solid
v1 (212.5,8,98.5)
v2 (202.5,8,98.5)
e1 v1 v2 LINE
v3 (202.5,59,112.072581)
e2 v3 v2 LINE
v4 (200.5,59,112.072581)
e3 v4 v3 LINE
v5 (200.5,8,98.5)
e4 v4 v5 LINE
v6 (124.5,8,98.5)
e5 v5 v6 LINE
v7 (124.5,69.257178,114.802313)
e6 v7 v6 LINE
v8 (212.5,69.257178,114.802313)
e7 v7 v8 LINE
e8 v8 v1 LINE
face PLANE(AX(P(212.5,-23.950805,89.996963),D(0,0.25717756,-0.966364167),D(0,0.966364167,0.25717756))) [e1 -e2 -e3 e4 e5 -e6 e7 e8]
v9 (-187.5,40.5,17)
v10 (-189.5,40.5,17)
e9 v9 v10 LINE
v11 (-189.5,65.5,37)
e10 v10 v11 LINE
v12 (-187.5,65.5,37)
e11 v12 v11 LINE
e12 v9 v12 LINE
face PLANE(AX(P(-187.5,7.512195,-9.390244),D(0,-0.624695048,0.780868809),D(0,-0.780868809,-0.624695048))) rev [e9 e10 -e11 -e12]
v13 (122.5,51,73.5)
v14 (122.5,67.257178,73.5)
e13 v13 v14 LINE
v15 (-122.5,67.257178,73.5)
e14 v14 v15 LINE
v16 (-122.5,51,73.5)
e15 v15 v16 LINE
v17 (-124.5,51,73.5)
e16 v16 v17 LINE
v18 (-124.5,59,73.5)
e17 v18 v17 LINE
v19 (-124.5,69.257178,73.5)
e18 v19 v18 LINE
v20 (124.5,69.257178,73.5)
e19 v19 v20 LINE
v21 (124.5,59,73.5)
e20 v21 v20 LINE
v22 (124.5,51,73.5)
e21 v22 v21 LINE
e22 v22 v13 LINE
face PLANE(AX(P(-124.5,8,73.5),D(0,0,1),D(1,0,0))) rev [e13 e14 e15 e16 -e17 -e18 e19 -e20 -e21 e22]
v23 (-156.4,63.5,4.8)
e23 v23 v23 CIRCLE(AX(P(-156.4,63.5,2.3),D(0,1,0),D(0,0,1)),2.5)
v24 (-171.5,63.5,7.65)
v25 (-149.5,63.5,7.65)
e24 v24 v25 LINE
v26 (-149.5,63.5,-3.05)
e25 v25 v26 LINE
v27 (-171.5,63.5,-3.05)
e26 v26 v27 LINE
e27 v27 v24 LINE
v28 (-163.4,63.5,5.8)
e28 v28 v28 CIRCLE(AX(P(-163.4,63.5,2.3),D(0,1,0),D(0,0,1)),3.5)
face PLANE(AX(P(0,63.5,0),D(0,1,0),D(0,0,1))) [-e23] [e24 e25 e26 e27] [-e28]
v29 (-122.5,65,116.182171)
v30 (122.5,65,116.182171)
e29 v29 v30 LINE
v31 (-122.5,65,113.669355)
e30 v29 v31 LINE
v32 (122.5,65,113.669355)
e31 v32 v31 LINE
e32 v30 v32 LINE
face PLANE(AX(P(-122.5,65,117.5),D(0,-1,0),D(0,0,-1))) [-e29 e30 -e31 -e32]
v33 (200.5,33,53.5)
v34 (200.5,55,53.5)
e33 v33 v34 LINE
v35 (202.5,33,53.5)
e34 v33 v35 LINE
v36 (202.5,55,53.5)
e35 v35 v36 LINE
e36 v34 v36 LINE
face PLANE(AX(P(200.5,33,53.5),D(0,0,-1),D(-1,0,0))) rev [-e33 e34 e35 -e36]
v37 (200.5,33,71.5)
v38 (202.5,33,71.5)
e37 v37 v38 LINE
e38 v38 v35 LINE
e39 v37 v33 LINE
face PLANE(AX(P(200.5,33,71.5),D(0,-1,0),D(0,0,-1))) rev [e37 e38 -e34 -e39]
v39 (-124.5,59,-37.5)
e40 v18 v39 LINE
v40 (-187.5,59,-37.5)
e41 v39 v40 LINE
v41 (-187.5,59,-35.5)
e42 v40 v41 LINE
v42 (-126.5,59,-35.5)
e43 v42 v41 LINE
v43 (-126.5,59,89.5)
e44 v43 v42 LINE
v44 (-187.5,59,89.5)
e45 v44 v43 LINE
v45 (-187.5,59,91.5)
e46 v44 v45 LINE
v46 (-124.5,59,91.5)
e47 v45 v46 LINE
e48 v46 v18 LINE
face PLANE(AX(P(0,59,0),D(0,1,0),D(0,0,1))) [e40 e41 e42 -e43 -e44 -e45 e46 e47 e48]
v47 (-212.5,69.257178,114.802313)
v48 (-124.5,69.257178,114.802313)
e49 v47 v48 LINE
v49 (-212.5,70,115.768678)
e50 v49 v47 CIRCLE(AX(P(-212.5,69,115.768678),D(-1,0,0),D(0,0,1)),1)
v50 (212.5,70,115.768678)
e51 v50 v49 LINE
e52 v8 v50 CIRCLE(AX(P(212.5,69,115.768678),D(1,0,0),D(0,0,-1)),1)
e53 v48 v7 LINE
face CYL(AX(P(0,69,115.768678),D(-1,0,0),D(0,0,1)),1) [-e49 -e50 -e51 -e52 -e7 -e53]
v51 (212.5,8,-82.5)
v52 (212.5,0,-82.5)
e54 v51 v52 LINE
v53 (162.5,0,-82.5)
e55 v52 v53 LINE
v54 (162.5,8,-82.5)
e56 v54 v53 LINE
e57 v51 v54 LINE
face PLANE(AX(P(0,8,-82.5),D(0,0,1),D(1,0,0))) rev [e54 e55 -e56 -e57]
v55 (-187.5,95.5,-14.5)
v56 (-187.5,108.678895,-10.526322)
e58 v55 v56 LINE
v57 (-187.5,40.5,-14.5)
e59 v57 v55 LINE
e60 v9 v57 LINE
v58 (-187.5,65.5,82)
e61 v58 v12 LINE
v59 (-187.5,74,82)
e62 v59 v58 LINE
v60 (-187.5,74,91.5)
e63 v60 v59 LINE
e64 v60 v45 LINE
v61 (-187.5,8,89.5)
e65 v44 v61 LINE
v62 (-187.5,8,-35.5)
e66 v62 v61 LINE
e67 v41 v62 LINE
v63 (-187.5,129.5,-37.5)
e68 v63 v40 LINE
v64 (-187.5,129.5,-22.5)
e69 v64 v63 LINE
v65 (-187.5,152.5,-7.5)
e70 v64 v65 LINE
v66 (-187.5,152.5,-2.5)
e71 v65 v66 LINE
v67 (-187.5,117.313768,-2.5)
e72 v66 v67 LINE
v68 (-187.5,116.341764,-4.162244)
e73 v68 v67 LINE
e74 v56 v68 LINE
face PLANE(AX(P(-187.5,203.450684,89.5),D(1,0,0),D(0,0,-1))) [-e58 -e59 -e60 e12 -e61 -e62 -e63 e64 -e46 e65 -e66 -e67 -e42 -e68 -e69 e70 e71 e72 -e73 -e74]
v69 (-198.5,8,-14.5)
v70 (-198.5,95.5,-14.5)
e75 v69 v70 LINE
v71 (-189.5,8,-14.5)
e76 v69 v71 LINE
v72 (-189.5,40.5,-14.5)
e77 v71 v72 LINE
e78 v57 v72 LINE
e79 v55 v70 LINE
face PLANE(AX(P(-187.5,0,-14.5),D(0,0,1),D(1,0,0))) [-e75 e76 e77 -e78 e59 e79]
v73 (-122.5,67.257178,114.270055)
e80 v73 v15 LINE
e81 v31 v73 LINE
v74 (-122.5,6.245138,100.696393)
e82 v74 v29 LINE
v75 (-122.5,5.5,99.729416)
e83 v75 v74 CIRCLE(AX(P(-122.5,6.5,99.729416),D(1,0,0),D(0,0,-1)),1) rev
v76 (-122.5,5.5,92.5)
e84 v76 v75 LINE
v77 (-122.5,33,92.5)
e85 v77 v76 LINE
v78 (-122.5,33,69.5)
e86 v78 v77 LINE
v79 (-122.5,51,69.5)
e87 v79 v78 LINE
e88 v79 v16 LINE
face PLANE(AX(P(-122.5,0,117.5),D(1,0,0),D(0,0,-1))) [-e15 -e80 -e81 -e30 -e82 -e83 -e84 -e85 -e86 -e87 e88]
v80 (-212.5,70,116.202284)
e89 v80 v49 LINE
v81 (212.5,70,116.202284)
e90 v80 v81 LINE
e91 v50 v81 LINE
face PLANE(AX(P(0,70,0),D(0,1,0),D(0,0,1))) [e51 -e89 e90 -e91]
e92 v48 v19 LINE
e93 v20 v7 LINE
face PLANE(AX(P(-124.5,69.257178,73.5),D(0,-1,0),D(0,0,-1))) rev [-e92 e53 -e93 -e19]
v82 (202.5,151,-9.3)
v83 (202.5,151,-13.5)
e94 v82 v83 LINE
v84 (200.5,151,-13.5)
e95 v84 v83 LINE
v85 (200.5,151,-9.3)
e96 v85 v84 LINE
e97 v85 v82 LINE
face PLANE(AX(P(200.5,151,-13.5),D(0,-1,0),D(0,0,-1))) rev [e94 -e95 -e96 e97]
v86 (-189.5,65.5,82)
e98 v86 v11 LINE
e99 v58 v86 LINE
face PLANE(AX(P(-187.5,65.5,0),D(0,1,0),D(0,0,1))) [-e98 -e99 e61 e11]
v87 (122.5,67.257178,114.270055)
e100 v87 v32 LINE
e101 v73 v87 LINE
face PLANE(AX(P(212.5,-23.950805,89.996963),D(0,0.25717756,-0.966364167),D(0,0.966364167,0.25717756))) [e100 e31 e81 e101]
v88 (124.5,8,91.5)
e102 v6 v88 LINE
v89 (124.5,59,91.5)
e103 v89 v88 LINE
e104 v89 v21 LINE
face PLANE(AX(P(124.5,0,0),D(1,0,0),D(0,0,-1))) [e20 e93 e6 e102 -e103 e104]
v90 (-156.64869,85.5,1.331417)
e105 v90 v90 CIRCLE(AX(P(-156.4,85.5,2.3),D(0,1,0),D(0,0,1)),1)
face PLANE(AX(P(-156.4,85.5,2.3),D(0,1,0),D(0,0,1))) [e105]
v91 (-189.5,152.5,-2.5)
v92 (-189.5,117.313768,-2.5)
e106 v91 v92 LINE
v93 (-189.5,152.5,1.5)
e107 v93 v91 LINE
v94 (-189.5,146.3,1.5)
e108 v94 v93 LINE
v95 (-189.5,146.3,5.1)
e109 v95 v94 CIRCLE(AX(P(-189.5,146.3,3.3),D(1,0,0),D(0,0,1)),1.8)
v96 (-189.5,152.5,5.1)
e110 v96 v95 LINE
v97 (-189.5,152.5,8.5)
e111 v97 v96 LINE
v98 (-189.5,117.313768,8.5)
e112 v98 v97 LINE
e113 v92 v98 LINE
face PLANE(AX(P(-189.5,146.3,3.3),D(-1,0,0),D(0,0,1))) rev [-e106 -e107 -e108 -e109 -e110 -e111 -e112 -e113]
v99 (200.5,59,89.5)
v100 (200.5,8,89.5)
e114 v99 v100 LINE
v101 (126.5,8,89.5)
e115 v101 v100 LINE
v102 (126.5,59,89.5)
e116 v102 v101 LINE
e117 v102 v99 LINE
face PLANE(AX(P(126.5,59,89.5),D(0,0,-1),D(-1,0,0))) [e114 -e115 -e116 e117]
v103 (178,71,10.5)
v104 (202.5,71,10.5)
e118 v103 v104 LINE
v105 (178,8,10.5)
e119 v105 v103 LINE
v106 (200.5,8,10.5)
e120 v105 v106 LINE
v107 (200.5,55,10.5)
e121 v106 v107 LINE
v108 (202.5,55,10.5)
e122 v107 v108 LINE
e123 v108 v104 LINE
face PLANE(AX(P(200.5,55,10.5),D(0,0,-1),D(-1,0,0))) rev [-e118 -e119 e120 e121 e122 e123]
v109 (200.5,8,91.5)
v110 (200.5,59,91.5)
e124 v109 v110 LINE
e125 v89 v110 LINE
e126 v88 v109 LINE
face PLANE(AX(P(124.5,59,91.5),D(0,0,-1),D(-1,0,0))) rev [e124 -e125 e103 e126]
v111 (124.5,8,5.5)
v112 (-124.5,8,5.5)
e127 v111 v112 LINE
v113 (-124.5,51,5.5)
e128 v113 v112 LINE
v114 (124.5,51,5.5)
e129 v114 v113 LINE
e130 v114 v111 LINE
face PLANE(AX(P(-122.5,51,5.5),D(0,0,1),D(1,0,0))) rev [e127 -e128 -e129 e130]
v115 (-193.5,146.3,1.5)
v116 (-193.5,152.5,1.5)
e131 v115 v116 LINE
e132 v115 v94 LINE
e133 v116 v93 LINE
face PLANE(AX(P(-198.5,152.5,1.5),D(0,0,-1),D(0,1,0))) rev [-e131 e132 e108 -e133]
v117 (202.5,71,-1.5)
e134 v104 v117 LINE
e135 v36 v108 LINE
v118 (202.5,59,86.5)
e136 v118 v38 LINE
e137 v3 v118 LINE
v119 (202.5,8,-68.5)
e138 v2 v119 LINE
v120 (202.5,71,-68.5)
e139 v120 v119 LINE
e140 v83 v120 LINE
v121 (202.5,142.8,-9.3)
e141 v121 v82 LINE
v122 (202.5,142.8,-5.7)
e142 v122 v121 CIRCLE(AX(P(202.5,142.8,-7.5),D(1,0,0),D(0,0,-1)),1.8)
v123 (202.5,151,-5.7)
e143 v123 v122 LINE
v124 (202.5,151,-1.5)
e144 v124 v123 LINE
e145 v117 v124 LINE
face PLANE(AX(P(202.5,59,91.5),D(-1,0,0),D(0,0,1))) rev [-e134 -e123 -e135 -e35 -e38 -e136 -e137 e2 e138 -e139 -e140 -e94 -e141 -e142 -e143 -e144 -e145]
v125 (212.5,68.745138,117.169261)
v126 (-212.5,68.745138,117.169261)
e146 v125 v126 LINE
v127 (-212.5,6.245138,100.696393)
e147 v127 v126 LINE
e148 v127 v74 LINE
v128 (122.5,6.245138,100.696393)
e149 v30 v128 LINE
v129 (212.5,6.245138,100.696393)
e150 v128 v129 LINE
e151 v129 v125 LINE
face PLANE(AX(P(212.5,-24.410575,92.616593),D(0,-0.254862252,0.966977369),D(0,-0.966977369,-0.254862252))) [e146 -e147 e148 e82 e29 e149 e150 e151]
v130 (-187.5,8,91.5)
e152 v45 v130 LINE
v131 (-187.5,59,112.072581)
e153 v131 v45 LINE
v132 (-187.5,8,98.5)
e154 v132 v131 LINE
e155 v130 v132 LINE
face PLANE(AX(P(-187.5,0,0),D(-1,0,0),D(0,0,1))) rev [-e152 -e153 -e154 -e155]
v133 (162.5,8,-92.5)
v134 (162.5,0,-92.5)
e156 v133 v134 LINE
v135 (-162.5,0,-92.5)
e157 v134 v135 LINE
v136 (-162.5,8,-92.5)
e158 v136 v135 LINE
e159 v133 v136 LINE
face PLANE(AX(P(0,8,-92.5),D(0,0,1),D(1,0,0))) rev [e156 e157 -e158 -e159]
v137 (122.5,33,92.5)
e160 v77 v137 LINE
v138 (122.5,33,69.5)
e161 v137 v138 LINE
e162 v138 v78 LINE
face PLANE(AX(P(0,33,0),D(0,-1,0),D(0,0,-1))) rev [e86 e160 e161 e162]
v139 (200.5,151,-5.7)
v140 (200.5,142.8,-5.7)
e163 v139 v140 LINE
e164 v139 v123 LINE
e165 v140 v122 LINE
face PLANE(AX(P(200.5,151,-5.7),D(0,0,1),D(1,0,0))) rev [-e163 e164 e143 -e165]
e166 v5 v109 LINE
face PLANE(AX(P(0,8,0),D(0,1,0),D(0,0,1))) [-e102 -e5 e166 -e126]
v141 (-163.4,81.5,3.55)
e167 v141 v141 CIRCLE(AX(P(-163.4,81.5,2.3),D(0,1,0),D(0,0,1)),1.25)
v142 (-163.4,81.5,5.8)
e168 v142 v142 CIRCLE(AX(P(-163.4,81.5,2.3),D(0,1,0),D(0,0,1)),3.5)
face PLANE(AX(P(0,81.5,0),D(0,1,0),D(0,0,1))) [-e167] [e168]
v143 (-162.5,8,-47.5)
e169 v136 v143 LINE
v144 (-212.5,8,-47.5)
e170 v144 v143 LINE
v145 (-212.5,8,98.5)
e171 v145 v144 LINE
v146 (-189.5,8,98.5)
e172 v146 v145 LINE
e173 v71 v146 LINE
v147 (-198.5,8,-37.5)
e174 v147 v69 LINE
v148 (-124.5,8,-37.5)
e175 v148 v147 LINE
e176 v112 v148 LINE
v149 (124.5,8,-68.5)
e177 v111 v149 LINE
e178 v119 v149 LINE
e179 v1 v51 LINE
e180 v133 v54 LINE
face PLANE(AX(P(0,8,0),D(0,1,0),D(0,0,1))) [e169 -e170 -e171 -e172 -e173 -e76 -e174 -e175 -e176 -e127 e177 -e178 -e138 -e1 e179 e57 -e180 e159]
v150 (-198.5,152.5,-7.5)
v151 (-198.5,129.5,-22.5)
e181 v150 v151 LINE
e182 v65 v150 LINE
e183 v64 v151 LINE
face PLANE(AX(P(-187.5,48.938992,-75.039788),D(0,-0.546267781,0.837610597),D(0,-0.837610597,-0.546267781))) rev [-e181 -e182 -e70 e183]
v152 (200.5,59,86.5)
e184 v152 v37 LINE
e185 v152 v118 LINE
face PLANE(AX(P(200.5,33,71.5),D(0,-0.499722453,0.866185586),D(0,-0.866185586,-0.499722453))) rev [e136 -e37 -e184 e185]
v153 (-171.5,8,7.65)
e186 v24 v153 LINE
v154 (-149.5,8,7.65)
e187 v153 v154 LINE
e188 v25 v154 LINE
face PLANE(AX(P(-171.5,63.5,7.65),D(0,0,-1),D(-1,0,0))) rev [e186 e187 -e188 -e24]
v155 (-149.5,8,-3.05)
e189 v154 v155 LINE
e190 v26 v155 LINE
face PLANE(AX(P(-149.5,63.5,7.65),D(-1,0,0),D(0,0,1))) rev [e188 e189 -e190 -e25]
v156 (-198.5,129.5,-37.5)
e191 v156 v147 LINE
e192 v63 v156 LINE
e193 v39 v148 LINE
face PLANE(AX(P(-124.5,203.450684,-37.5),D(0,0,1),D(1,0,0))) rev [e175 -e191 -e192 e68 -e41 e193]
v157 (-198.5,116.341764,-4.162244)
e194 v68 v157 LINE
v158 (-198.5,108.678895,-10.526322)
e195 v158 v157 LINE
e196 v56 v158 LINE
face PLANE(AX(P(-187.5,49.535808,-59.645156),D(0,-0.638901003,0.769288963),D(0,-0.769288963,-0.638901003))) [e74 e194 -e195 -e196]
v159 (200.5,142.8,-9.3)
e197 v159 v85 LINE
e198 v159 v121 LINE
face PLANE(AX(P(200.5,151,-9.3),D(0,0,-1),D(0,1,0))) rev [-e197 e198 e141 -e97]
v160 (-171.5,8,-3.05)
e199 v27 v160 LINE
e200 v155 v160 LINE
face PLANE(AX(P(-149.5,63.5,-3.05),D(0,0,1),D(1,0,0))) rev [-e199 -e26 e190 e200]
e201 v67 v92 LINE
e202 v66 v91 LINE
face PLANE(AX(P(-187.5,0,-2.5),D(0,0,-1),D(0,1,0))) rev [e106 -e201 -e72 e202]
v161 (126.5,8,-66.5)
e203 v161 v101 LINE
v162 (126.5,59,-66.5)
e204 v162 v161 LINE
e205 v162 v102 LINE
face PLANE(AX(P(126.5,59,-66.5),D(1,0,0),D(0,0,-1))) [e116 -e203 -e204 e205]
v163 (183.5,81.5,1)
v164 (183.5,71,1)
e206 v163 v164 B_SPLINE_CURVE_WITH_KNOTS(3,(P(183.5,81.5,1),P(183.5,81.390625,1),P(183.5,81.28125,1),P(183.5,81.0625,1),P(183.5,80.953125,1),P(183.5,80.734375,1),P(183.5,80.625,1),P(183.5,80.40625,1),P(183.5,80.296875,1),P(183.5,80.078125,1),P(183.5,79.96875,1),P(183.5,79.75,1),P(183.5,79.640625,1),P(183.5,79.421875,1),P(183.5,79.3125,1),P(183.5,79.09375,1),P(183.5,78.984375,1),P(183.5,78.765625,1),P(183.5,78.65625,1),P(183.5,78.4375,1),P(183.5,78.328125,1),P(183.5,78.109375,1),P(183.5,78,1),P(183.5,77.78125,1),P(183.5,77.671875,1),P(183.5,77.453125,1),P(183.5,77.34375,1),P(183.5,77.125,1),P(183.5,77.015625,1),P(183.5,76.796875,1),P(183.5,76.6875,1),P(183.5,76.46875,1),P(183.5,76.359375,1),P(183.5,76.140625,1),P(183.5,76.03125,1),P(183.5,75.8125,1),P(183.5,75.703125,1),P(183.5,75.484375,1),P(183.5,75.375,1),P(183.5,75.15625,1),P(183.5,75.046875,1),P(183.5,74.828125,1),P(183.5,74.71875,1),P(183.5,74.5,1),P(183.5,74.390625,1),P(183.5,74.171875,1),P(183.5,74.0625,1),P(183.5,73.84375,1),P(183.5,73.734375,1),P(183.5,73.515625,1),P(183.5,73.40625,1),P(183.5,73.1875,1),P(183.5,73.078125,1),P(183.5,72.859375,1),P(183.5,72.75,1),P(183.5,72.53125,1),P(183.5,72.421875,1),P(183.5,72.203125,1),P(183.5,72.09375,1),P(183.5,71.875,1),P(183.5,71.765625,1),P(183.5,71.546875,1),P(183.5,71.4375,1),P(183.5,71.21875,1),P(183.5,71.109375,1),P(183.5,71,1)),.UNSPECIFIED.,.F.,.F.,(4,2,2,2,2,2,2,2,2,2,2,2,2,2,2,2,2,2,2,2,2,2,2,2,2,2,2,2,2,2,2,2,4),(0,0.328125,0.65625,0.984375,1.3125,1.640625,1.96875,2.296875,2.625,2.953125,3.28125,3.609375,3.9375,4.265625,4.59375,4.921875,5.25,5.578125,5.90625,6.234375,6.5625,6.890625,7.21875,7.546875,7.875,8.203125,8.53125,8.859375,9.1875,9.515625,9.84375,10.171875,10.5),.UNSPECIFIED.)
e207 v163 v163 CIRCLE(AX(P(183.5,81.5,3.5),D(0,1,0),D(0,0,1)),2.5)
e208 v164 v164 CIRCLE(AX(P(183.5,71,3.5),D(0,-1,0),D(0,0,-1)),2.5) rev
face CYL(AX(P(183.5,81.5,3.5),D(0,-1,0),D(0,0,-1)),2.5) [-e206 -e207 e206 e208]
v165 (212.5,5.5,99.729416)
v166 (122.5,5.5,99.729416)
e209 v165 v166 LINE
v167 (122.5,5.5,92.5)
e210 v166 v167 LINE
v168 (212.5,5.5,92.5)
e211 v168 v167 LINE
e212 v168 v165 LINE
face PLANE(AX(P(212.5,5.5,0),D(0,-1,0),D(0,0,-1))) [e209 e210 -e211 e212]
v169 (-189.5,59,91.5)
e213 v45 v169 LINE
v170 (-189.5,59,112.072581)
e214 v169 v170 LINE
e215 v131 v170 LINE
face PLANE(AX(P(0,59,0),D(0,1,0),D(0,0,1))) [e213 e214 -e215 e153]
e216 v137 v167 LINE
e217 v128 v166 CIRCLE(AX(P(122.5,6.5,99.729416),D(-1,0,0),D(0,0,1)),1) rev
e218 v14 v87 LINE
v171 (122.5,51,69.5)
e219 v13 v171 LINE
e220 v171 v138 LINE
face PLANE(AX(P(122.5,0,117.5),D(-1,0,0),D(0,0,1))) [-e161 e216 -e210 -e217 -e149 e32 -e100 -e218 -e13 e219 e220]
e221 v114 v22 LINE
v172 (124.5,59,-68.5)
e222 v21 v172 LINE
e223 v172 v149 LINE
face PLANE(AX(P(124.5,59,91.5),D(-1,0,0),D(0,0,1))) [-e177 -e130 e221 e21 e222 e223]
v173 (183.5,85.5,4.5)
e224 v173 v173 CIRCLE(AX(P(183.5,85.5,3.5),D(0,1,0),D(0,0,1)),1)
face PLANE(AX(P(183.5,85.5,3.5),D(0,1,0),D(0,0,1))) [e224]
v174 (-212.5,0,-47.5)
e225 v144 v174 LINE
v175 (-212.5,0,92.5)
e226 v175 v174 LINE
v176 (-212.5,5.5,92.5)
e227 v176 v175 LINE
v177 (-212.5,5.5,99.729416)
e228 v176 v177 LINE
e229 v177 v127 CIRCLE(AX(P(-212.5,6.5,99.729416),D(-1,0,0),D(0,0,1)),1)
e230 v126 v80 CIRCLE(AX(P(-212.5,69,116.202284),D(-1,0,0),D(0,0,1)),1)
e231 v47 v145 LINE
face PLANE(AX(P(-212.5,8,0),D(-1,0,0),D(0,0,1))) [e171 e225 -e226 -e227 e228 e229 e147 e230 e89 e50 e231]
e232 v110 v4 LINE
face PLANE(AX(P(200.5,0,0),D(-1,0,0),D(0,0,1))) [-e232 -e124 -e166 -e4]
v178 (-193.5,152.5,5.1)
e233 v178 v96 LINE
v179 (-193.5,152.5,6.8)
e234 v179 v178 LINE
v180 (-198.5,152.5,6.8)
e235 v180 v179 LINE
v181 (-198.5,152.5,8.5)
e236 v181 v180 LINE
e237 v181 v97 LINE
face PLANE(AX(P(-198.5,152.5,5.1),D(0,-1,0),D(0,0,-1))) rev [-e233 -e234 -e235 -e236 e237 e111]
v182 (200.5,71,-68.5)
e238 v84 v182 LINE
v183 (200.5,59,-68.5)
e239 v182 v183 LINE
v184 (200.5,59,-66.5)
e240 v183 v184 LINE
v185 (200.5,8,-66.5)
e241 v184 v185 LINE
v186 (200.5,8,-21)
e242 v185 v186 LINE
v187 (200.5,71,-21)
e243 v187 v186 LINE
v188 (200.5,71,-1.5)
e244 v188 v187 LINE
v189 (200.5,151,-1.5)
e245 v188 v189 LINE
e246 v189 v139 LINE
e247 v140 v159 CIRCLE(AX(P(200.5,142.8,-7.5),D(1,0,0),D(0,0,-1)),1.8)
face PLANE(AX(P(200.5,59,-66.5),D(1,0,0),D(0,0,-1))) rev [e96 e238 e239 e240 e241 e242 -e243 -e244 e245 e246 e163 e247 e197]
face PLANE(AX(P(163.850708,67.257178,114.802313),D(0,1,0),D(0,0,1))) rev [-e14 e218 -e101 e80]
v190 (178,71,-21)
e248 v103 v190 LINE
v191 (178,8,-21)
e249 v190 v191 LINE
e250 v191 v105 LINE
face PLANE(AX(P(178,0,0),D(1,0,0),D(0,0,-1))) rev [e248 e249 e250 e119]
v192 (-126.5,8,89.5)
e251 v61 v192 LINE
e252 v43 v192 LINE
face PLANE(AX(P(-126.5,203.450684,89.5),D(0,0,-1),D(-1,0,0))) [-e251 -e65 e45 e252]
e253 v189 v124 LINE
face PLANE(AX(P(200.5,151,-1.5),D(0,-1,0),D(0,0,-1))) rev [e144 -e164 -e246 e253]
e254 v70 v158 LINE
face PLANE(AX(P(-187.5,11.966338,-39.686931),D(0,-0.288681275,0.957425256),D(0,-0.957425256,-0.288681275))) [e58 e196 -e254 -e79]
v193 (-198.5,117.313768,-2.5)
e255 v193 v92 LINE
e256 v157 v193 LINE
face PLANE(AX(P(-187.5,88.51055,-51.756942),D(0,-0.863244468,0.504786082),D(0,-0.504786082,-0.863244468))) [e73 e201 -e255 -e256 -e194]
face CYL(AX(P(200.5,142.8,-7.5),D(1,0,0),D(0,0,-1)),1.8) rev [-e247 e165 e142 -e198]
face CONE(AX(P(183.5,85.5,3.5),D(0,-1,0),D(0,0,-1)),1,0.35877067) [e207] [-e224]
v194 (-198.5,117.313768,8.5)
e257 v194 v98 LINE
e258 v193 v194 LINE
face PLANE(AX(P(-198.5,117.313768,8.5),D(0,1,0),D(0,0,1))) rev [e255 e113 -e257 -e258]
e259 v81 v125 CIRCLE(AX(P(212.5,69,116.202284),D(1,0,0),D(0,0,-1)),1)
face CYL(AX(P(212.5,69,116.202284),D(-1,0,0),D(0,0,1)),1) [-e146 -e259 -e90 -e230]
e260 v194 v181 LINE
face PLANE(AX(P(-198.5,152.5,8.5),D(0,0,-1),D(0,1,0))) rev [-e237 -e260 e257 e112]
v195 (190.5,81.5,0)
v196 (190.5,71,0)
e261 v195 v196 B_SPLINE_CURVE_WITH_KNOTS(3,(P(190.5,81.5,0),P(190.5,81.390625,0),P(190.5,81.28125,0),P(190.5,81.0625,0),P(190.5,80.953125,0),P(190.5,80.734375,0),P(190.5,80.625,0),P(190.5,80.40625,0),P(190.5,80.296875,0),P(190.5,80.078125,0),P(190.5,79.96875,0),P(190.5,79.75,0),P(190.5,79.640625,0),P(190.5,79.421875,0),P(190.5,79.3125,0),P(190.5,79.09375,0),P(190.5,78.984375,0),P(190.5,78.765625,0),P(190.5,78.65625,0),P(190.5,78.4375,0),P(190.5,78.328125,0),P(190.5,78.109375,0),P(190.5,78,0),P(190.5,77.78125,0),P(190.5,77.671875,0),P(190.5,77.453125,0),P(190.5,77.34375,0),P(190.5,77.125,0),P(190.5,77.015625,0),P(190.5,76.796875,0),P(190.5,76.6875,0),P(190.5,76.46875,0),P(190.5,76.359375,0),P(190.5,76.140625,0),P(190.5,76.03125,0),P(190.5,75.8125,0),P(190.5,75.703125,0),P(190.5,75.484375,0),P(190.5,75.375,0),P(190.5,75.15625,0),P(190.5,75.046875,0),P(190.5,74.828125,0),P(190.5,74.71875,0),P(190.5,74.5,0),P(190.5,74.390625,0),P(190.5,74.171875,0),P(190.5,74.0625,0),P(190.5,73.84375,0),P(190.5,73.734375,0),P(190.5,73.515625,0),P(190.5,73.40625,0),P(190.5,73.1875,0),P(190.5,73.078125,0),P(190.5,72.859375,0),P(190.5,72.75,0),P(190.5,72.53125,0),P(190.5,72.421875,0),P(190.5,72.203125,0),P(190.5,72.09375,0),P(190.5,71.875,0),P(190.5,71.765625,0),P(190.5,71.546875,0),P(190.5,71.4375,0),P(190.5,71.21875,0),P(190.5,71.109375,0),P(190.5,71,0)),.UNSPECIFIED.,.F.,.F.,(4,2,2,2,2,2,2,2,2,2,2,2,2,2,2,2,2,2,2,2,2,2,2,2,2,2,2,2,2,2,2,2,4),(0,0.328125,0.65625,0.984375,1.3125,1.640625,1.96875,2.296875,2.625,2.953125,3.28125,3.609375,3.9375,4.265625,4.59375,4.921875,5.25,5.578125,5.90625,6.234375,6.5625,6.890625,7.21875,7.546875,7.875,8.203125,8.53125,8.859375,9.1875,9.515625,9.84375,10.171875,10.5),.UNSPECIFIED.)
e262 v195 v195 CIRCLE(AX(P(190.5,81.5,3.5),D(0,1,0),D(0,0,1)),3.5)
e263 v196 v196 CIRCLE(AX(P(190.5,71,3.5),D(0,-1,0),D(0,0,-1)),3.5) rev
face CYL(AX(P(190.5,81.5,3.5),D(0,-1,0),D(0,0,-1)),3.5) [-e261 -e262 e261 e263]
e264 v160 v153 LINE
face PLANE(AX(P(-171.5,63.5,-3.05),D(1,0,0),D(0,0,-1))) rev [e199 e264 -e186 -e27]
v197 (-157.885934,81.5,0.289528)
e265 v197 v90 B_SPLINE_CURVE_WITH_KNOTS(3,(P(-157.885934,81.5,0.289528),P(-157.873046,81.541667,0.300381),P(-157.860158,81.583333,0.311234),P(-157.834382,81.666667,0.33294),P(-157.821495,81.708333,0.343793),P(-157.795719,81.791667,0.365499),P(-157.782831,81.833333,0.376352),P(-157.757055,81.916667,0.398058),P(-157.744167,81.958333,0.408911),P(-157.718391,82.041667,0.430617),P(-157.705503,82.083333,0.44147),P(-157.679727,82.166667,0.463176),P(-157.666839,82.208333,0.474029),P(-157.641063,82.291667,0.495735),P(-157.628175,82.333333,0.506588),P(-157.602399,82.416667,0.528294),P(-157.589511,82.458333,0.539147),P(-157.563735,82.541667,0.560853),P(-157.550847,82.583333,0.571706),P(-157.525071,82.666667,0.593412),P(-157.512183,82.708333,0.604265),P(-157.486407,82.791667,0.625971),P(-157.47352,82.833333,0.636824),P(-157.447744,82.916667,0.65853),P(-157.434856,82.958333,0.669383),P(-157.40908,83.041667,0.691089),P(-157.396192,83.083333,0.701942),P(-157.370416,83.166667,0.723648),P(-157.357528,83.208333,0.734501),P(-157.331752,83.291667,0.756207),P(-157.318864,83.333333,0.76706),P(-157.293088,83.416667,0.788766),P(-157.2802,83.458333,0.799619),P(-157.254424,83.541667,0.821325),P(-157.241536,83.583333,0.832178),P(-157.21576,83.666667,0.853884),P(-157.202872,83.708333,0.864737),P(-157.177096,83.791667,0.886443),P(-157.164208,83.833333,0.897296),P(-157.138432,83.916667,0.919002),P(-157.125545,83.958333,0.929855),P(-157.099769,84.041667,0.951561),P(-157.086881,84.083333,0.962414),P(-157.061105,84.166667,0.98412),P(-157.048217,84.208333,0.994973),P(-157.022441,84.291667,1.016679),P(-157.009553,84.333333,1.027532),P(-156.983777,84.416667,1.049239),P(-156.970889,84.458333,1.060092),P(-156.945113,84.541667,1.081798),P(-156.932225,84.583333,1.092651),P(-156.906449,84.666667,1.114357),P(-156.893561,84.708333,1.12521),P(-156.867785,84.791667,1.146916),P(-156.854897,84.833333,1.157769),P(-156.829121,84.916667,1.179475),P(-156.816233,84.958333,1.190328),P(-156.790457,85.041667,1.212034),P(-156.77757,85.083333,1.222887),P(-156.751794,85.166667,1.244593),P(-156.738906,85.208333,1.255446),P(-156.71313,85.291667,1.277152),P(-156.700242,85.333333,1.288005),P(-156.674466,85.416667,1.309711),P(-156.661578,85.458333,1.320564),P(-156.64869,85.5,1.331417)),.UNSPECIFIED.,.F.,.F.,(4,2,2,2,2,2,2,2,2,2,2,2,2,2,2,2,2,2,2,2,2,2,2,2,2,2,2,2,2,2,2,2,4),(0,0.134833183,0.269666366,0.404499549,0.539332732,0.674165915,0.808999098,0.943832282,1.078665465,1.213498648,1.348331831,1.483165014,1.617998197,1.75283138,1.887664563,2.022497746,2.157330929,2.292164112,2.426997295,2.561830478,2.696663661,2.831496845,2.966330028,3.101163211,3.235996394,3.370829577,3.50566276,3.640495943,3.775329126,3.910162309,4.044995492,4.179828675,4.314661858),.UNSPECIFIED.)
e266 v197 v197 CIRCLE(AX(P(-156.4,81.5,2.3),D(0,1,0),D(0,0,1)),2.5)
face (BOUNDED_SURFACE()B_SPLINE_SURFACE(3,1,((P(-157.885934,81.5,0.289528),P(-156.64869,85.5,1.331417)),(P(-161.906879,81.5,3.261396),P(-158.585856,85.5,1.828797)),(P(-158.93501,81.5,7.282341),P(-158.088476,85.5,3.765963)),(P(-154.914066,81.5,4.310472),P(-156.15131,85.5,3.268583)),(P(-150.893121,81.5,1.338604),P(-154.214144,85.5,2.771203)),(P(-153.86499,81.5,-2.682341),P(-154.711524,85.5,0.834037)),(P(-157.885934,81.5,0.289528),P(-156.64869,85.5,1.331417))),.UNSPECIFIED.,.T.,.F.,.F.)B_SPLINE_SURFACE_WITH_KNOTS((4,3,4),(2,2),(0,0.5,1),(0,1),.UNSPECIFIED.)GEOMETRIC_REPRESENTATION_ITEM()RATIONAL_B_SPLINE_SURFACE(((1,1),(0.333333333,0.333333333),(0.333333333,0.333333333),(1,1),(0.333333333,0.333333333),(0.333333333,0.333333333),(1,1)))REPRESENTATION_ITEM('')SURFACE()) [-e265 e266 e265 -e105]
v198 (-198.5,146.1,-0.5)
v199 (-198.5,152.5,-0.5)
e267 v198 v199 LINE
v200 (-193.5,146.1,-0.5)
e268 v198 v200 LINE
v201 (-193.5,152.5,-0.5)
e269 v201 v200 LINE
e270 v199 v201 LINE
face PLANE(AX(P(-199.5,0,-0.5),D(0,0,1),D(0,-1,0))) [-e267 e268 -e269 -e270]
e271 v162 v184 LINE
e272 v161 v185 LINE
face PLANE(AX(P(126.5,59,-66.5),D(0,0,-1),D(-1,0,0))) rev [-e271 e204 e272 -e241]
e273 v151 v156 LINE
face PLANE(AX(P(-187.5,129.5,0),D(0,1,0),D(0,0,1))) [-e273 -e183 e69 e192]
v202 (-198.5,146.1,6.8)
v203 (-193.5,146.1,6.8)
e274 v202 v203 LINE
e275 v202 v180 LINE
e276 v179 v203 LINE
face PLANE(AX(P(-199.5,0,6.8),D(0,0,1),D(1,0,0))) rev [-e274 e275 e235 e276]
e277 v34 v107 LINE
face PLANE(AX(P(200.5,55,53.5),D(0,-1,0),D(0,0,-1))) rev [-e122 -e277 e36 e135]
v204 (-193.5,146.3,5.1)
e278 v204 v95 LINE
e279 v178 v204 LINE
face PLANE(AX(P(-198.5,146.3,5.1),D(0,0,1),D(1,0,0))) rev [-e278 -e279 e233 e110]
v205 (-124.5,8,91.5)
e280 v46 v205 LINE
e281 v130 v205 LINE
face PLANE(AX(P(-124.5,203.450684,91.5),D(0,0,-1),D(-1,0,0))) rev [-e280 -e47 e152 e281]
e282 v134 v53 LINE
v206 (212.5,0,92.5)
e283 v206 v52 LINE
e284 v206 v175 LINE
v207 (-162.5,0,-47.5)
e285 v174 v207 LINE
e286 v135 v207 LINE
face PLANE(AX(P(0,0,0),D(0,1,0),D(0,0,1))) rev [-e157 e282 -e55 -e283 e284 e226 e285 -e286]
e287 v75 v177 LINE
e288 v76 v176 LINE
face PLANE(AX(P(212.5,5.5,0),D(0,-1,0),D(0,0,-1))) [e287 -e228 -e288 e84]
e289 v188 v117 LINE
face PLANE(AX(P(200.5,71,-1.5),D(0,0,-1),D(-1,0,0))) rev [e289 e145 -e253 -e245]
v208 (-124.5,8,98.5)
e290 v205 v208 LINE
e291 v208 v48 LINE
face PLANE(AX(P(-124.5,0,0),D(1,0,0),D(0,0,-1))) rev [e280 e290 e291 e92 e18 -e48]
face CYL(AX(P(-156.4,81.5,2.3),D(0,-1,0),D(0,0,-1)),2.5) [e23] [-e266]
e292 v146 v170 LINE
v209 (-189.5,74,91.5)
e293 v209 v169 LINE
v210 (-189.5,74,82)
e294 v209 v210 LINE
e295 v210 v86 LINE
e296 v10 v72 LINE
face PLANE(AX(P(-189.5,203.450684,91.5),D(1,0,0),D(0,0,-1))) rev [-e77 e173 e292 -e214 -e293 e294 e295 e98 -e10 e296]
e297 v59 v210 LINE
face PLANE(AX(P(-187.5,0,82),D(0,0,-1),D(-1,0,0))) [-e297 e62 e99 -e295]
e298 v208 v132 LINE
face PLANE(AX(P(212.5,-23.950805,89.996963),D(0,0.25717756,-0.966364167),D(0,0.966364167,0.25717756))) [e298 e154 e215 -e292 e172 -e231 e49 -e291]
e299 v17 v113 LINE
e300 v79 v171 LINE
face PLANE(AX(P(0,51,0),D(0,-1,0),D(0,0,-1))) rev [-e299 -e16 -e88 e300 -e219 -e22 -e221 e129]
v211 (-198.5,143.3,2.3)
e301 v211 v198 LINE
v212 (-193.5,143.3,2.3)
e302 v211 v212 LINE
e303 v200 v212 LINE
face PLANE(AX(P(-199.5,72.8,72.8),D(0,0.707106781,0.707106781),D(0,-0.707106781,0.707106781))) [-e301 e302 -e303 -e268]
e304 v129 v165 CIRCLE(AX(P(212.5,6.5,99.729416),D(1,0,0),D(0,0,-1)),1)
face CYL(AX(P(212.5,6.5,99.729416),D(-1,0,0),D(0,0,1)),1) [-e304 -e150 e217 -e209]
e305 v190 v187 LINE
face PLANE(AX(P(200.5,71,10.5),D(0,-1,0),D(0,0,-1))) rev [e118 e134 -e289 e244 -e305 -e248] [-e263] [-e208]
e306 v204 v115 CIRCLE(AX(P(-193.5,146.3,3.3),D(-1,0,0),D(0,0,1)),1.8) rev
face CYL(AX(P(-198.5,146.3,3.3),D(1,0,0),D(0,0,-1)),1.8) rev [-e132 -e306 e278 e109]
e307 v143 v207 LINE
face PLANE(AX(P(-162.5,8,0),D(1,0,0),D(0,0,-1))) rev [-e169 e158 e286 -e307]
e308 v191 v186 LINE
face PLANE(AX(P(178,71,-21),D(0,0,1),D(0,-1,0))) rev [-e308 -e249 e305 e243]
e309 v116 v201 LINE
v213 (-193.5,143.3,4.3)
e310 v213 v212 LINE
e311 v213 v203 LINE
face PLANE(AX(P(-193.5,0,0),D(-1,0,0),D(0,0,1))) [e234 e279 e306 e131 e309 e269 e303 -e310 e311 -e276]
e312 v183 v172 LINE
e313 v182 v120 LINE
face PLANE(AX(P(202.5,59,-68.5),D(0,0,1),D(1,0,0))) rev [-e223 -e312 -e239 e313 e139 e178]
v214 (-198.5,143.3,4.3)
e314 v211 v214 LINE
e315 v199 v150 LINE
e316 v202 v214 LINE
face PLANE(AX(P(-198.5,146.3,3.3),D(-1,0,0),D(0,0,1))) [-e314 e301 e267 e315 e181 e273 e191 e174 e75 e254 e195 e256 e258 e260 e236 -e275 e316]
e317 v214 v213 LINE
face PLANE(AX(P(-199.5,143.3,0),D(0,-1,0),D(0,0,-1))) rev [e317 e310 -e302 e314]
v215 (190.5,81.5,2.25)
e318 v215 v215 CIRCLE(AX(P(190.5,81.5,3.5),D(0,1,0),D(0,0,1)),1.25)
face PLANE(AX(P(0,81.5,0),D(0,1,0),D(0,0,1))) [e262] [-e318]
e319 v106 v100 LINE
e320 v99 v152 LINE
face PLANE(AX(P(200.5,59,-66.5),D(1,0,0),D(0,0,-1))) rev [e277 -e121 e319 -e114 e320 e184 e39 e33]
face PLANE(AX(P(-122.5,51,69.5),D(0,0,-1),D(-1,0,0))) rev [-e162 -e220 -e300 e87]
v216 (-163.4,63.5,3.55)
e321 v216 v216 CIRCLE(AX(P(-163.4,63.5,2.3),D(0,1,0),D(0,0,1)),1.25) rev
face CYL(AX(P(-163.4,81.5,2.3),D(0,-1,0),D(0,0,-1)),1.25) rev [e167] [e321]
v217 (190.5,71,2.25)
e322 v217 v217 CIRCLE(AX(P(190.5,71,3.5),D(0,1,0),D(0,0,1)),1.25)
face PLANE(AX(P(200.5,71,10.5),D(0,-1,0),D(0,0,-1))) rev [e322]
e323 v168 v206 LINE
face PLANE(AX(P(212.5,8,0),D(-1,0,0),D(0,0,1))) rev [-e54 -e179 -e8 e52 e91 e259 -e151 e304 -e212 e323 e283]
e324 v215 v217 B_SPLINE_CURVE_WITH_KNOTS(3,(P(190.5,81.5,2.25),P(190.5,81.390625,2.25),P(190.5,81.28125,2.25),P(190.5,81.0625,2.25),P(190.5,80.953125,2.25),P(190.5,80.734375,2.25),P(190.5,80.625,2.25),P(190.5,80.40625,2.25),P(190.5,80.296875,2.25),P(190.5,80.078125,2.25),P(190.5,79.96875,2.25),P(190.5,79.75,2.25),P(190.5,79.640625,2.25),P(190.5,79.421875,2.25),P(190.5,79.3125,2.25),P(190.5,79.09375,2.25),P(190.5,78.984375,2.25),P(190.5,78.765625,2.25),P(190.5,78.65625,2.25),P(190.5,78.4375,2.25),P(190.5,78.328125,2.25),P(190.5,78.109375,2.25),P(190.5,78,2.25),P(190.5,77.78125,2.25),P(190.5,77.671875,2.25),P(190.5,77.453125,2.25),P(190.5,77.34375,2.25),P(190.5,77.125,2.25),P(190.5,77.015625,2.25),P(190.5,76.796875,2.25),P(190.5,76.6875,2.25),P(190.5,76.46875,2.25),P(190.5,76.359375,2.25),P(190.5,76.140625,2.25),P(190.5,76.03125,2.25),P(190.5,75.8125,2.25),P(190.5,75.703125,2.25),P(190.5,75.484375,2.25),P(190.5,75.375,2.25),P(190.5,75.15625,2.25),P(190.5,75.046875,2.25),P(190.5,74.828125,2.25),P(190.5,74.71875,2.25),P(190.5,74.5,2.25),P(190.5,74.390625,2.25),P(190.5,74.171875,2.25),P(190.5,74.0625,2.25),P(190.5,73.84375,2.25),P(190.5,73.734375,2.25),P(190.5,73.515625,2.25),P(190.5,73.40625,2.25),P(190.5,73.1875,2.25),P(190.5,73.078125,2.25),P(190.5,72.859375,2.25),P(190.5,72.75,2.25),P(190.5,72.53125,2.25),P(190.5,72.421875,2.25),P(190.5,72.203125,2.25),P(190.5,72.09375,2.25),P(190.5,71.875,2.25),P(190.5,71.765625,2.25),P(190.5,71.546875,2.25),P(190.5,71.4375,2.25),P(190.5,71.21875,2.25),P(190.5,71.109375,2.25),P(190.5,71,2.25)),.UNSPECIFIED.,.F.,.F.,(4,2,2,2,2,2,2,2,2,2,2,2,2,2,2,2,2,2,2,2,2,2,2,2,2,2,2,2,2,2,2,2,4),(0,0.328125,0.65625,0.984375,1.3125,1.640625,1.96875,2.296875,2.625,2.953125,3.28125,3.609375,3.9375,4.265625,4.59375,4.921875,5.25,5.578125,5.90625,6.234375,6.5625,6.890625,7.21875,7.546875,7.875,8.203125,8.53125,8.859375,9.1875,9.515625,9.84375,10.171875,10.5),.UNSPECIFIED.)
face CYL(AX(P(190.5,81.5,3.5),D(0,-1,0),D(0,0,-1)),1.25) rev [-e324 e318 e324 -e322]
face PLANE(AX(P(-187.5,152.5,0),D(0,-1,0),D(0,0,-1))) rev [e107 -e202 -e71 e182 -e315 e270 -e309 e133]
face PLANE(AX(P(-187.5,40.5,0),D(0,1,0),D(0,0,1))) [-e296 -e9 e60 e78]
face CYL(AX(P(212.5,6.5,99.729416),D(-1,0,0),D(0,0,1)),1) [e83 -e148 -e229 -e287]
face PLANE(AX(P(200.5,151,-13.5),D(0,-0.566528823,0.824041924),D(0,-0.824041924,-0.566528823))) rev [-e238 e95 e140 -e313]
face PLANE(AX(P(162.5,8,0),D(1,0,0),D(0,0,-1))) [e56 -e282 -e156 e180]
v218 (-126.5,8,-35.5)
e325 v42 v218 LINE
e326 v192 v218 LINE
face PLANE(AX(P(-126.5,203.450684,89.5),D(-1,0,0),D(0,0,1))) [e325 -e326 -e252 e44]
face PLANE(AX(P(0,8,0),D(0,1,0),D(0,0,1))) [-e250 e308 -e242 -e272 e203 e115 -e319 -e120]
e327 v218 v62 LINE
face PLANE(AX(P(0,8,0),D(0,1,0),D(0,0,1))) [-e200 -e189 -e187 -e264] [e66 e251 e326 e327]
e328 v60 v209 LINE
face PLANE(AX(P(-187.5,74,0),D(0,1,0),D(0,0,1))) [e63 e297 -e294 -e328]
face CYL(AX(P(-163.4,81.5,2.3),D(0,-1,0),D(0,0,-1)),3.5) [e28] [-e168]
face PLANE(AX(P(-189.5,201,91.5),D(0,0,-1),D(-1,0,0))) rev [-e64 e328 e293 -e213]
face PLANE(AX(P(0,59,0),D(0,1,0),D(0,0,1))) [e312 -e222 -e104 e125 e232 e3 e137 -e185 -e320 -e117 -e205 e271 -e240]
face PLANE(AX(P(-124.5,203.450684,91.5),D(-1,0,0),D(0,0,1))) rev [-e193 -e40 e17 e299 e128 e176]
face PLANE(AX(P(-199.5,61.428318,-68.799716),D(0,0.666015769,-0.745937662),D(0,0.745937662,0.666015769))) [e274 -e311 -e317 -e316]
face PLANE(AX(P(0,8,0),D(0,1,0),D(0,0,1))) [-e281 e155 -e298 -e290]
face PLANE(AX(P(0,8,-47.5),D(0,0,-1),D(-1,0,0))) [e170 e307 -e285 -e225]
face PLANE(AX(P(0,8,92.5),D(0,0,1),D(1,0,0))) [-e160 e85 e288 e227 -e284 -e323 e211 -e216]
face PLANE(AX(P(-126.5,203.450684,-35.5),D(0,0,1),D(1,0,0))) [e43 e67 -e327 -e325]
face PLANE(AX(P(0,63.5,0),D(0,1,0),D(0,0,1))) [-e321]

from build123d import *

# Parameters (mm, degrees)
SALIENTE_EXTRUIR3_DEPTH     = 8
CROQUIS4_W                  = 425
CROQUIS4_H                  = 25
SALIENTE_EXTRUIR5_DEPTH     = 70
CORTAR_EXTRUIR5_DEPTH       = 447.465284205
REDONDEO2_R                 = 1
CROQUIS7_W                  = 245
CROQUIS7_H                  = 65
CORTAR_EXTRUIR6_DEPTH       = 25
CROQUIS8_W                  = 245
CROQUIS8_H                  = 23
SALIENTE_EXTRUIR6_DEPTH     = 25
SALIENTE_EXTRUIR7_DEPTH     = 2
SALIENTE_EXTRUIR8_DEPTH     = 2
CROQUIS13_W                 = 41.302313383
CROQUIS13_H                 = 2
SALIENTE_EXTRUIR13_DEPTH    = 245
CROQUIS15_W                 = 78
CROQUIS15_H                 = 160
CROQUIS15_W_2               = 74
CROQUIS15_H_2               = 156
SALIENTE_EXTRUIR15_DEPTH    = 51
CROQUIS16_W                 = 245
CROQUIS16_H                 = 64
SALIENTE_EXTRUIR16_DEPTH    = 43
CROQUIS17_W                 = 2
CROQUIS17_H                 = 68
SALIENTE_EXTRUIR18_DEPTH    = 43
SALIENTE_EXTRUIR21_DEPTH    = 2
CROQUIS20_W                 = 2
CROQUIS20_H                 = 160
SALIENTE_EXTRUIR22_DEPTH    = 100
CORTAR_EXTRUIR7_DEPTH       = 2
CROQUIS22_W                 = 2
CROQUIS22_H                 = 68
SALIENTE_EXTRUIR23_DEPTH    = 43
CROQUIS23_W                 = 65
CROQUIS23_H                 = 129
CROQUIS23_W_2               = 61
CROQUIS23_H_2               = 125
SALIENTE_EXTRUIR24_DEPTH    = 51
SALIENTE_EXTRUIR26_DEPTH    = 2
CROQUIS27_W                 = 2
CROQUIS27_H                 = 129
SALIENTE_EXTRUIR27_DEPTH    = 150
CORTAR_EXTRUIR9_DEPTH       = 2
SALIENTE_EXTRUIR28_DEPTH    = 9
CORTAR_EXTRUIR10_DEPTH      = 1
CORTAR_EXTRUIR10_DEPTH_BACK = 5
CROQUIS33_W                 = 22
CROQUIS33_H                 = 10.7
SALIENTE_EXTRUIR29_DEPTH    = 55.5
CROQUIS34_R                 = 3.5
CROQUIS34_R_2               = 1.25
CROQUIS34_R_3               = 2.5
SALIENTE_EXTRUIR30_DEPTH    = 18
CROQUIS36_W                 = 31.5
CROQUIS36_H                 = 63
SALIENTE_EXTRUIR34_DEPTH    = 22.5
CROQUIS37_R                 = 3.5
CROQUIS37_R_2               = 1.25
CROQUIS37_R_3               = 2.5
SALIENTE_EXTRUIR35_DEPTH    = 10.5
CROQUIS38_R                 = 1
SALIENTE_EXTRUIR36_DEPTH    = 4
CROQUIS39_R                 = 1
SALIENTE_EXTRUIR37_DEPTH    = 4


with BuildPart() as part:
    # Croquis1 → Saliente-Extruir3 (new body)
    with BuildSketch(Plane(origin=(0, 0, 0), x_dir=(1, 0, 0), z_dir=(0, 1, 0))):
        Polygon((-212.5, -92.5), (212.5, -92.5), (212.5, 82.5), (162.5, 82.5), (162.5, 92.5), (-162.5, 92.5), (-162.5, 47.5), (-212.5, 47.5), align=None)
    extrude(amount=SALIENTE_EXTRUIR3_DEPTH)



with BuildPart() as body_2:
    # Croquis4 → Saliente-Extruir5 (new body)
    with BuildSketch(Plane.XZ):
        with Locations((0, 105)):
            Rectangle(CROQUIS4_W, CROQUIS4_H)
    extrude(amount=-SALIENTE_EXTRUIR5_DEPTH)

    # Croquis5 → Cortar-Extruir5 (cut, through all)
    with BuildSketch(Plane.ZY.offset(212.5)):
        Polygon((92.5, 70), (92.5, 8), (98.5, 8), (115, 70), align=None)
        Polygon((100.5, 5.5), (92.5, 5.5), (92.5, 0), (117.5, 0), (117.5, 70), align=None)
    extrude(amount=-CORTAR_EXTRUIR5_DEPTH, mode=Mode.SUBTRACT)

    # Redondeo2
    redondeo2_edges = [body_2.edges().sort_by_distance(p)[0] for p in [
        (0, 70, 117.5),
        (0, 5.5, 100.5),
        (0, 70, 115),
    ]]
    fillet(redondeo2_edges, radius=REDONDEO2_R)

    # Croquis7 → Cortar-Extruir6 (cut)
    with BuildSketch(Plane.XY.offset(92.5)):
        with Locations((0, 32.5)):
            Rectangle(CROQUIS7_W, CROQUIS7_H)
    extrude(amount=CORTAR_EXTRUIR6_DEPTH, mode=Mode.SUBTRACT)


with BuildPart() as part_1:
    add(part.part)

    add(body_2.part)  # Saliente-Extruir6 merges body 2
    # Croquis8 → Saliente-Extruir6 (add)
    with BuildSketch(Plane(origin=(0, 8, 0), x_dir=(1, 0, 0), z_dir=(0, 1, 0))):
        with Locations((0, -81)):
            Rectangle(CROQUIS8_W, CROQUIS8_H)
    extrude(amount=SALIENTE_EXTRUIR6_DEPTH)

    # Croquis9 → Saliente-Extruir7 (add)
    with BuildSketch(Plane.ZY.offset(122.5)):
        Polygon((114.802313383, 69.25717756), (98.5, 8), (73.5, 8), (73.5, 69.25717756), align=None)
    extrude(amount=SALIENTE_EXTRUIR7_DEPTH)

    # Croquis10 → Saliente-Extruir8 (add)
    with BuildSketch(Plane(origin=(122.5, 0, 0), x_dir=(0, 0, -1), z_dir=(1, 0, 0))):
        Polygon((-114.802313383, 69.25717756), (-98.5, 8), (-73.5, 8), (-73.5, 69.25717756), align=None)
    extrude(amount=SALIENTE_EXTRUIR8_DEPTH)

    # Croquis13 → Saliente-Extruir13 (add)
    with BuildSketch(Plane(origin=(-122.5, 0, 0), x_dir=(0, 0, -1), z_dir=(1, 0, 0))):
        with Locations((-94.151156692, 68.25717756)):
            Rectangle(CROQUIS13_W, CROQUIS13_H)
    extrude(amount=SALIENTE_EXTRUIR13_DEPTH)

    # Croquis15 → Saliente-Extruir15 (add)
    with BuildSketch(Plane(origin=(0, 8, 0), x_dir=(1, 0, 0), z_dir=(0, 1, 0))):
        with Locations((163.5, -11.5)):
            Rectangle(CROQUIS15_W, CROQUIS15_H)
        with Locations((163.5, -11.5)):
            Rectangle(CROQUIS15_W_2, CROQUIS15_H_2, mode=Mode.SUBTRACT)
    extrude(amount=SALIENTE_EXTRUIR15_DEPTH)

    # Croquis16 → Saliente-Extruir16 (add)
    with BuildSketch(Plane(origin=(0, 8, 0), x_dir=(1, 0, 0), z_dir=(0, 1, 0))):
        with Locations((0, -37.5)):
            Rectangle(CROQUIS16_W, CROQUIS16_H)
    extrude(amount=SALIENTE_EXTRUIR16_DEPTH)

    # Croquis17 → Saliente-Extruir18 (add)
    with BuildSketch(Plane(origin=(0, 8, 0), x_dir=(1, 0, 0), z_dir=(0, 1, 0))):
        with Locations((123.5, -39.5)):
            Rectangle(CROQUIS17_W, CROQUIS17_H)
    extrude(amount=SALIENTE_EXTRUIR18_DEPTH)

    # Croquis18 → Saliente-Extruir21 (add)
    with BuildSketch(Plane(origin=(202.5, 0, 0), x_dir=(0, 0, -1), z_dir=(1, 0, 0))):
        Polygon((-91.5, 8), (-98.5, 8), (-112.072580645, 59), (-91.5, 59), align=None)
    extrude(amount=-SALIENTE_EXTRUIR21_DEPTH)

    # Croquis20 → Saliente-Extruir22 (add)
    with BuildSketch(Plane(origin=(0, 59, 0), x_dir=(1, 0, 0), z_dir=(0, 1, 0))):
        with Locations((201.5, -11.5)):
            Rectangle(CROQUIS20_W, CROQUIS20_H)
    extrude(amount=SALIENTE_EXTRUIR22_DEPTH)

    # Croquis21 → Cortar-Extruir7 (cut)
    with BuildSketch(Plane(origin=(202.5, 0, 0), x_dir=(0, 0, -1), z_dir=(1, 0, 0))):
        with BuildLine():
            Line((-91.5, 59), (-86.5, 59))
            Line((-86.5, 59), (-71.5, 33))
            Line((-71.5, 33), (-53.5, 33))
            Line((-53.5, 33), (-53.5, 55))
            Line((-53.5, 55), (-10.5, 55))
            Line((-10.5, 55), (-10.5, 71))
            Line((-10.5, 71), (1.5, 71))
            Line((1.5, 71), (1.5, 151))
            Line((1.5, 151), (5.7, 151))
            Line((5.7, 151), (5.7, 142.8))
            ThreePointArc((5.7, 142.8), (7.5, 141), (9.3, 142.8))
            Line((9.3, 142.8), (9.3, 151))
            Line((9.3, 151), (13.5, 151))
            Line((13.5, 151), (68.5, 71))
            Line((68.5, 71), (68.5, 159))
            Line((68.5, 159), (-91.5, 159))
            Line((-91.5, 159), (-91.5, 59))
        make_face()
    extrude(amount=-CORTAR_EXTRUIR7_DEPTH, mode=Mode.SUBTRACT)

    # Croquis22 → Saliente-Extruir23 (add)
    with BuildSketch(Plane(origin=(0, 8, 0), x_dir=(1, 0, 0), z_dir=(0, 1, 0))):
        with Locations((-123.5, -39.5)):
            Rectangle(CROQUIS22_W, CROQUIS22_H)
    extrude(amount=SALIENTE_EXTRUIR23_DEPTH)

    # Croquis23 → Saliente-Extruir24 (add)
    with BuildSketch(Plane(origin=(0, 8, 0), x_dir=(1, 0, 0), z_dir=(0, 1, 0))):
        with Locations((-157, -27)):
            Rectangle(CROQUIS23_W, CROQUIS23_H)
        with Locations((-157, -27)):
            Rectangle(CROQUIS23_W_2, CROQUIS23_H_2, mode=Mode.SUBTRACT)
    extrude(amount=SALIENTE_EXTRUIR24_DEPTH)

    # Croquis26 → Saliente-Extruir26 (add)
    with BuildSketch(Plane.ZY.offset(189.5)):
        Polygon((91.5, 8), (98.5, 8), (112.072580645, 59), (91.5, 59), align=None)
    extrude(amount=-SALIENTE_EXTRUIR26_DEPTH)

    # Croquis27 → Saliente-Extruir27 (add)
    with BuildSketch(Plane(origin=(0, 51, 0), x_dir=(1, 0, 0), z_dir=(0, 1, 0))):
        with Locations((-188.5, -27)):
            Rectangle(CROQUIS27_W, CROQUIS27_H)
    extrude(amount=SALIENTE_EXTRUIR27_DEPTH)

    # Croquis28 → Cortar-Extruir9 (cut)
    with BuildSketch(Plane.ZY.offset(189.5)):
        Polygon((91.5, 74), (82, 74), (82, 65.5), (37, 65.5), (17, 40.5), (-14.5, 40.5), (-14.5, 95.5), (-10.526321509, 108.678894785), (-4.162244055, 116.341763556), (-2.5, 117.313768237), (-2.5, 152.5), (-7.5, 152.5), (-22.5, 129.5), (-37.5, 129.5), (-37.5, 201), (91.5, 201), align=None)
    extrude(amount=-CORTAR_EXTRUIR9_DEPTH, mode=Mode.SUBTRACT)

    # Croquis29 → Saliente-Extruir28 (add)
    with BuildSketch(Plane.ZY.offset(189.5)):
        with BuildLine():
            Line((-14.5, 95.5), (-10.526321509, 108.678894785))
            Line((-10.526321509, 108.678894785), (-4.162244055, 116.341763556))
            Line((-4.162244055, 116.341763556), (-2.5, 117.313768237))
            Line((-2.5, 117.313768237), (8.5, 117.313768237))
            Line((8.5, 117.313768237), (8.5, 152.5))
            Line((8.5, 152.5), (5.1, 152.5))
            Line((5.1, 152.5), (5.1, 146.3))
            ThreePointArc((5.1, 146.3), (3.3, 144.5), (1.5, 146.3))
            Line((1.5, 146.3), (1.5, 152.5))
            Line((1.5, 152.5), (-7.5, 152.5))
            Line((-7.5, 152.5), (-22.5, 129.5))
            Line((-22.5, 129.5), (-37.5, 129.5))
            Line((-37.5, 129.5), (-37.5, 8))
            Line((-37.5, 8), (-14.5, 8))
            Line((-14.5, 8), (-14.5, 95.5))
        make_face()
    extrude(amount=SALIENTE_EXTRUIR28_DEPTH)

    # Croquis30 → Cortar-Extruir10 (cut, two sides: drawn at the far end of the back side and taken through both)
    with BuildSketch(Plane.ZY.offset(198.5).offset(-CORTAR_EXTRUIR10_DEPTH_BACK)):
        with BuildLine():
            Line((1.5, 152.5), (-0.5, 152.5))
            Line((-0.5, 152.5), (-0.5, 146.1))
            Line((-0.5, 146.1), (2.3, 143.3))
            Line((2.3, 143.3), (4.3, 143.3))
            Line((4.3, 143.3), (6.8, 146.1))
            Line((6.8, 146.1), (6.8, 152.5))
            Line((6.8, 152.5), (5.1, 152.5))
            Line((5.1, 152.5), (5.1, 146.3))
            ThreePointArc((5.1, 146.3), (3.3, 144.5), (1.5, 146.3))
            Line((1.5, 146.3), (1.5, 152.5))
        make_face()
    extrude(amount=CORTAR_EXTRUIR10_DEPTH + CORTAR_EXTRUIR10_DEPTH_BACK, mode=Mode.SUBTRACT)

    # Croquis33 → Saliente-Extruir29 (add)
    with BuildSketch(Plane(origin=(0, 8, 0), x_dir=(1, 0, 0), z_dir=(0, 1, 0))):
        with Locations((-160.5, -2.3)):
            Rectangle(CROQUIS33_W, CROQUIS33_H)
    extrude(amount=SALIENTE_EXTRUIR29_DEPTH)

    # Croquis34 → Saliente-Extruir30 (add)
    # profile 1 of 2: a face of its own
    with BuildSketch(Plane(origin=(0, 63.5, 0), x_dir=(1, 0, 0), z_dir=(0, 1, 0))):
        with Locations(Location((-163.4, -2.3, 0), (0, 0, 270))):
            Circle(CROQUIS34_R)
        with Locations(Location((-163.4, -2.3, 0), (0, 0, 270))):
            Circle(CROQUIS34_R_2, mode=Mode.SUBTRACT)
    # profile 2 of 2: a face of its own
    with BuildSketch(Plane(origin=(0, 63.5, 0), x_dir=(1, 0, 0), z_dir=(0, 1, 0))):
        with Locations(Location((-156.4, -2.3, 0), (0, 0, 270))):
            Circle(CROQUIS34_R_3)
    extrude(amount=SALIENTE_EXTRUIR30_DEPTH)

    # Croquis36 → Saliente-Extruir34 (add)
    with BuildSketch(Plane.ZY.offset(-200.5)):
        with Locations((-5.25, 39.5)):
            Rectangle(CROQUIS36_W, CROQUIS36_H)
    extrude(amount=SALIENTE_EXTRUIR34_DEPTH)

    # Croquis37 → Saliente-Extruir35 (add)
    # profile 1 of 2: a face of its own
    with BuildSketch(Plane(origin=(0, 71, 0), x_dir=(1, 0, 0), z_dir=(0, 1, 0))):
        with Locations(Location((190.5, -3.5, 0), (0, 0, 90))):
            Circle(CROQUIS37_R)
        with Locations(Location((190.5, -3.5, 0), (0, 0, 90))):
            Circle(CROQUIS37_R_2, mode=Mode.SUBTRACT)
    # profile 2 of 2: a face of its own
    with BuildSketch(Plane(origin=(0, 71, 0), x_dir=(1, 0, 0), z_dir=(0, 1, 0))):
        with Locations(Location((183.5, -3.5, 0), (0, 0, 90))):
            Circle(CROQUIS37_R_3)
    extrude(amount=SALIENTE_EXTRUIR35_DEPTH)

    # Croquis38 → Saliente-Extruir36 (add)
    with BuildSketch(Plane(origin=(0, 81.5, 0), x_dir=(1, 0, 0), z_dir=(0, 1, 0))):
        with Locations(Location((183.5, -3.5, 0), (0, 0, 270))):
            Circle(CROQUIS38_R)
    extrude(amount=SALIENTE_EXTRUIR36_DEPTH)

    # loft up to a face of the part (recubrir2)
    loft([Face(Wire([part_1.edges().sort_by_distance((184.228968627, 85.5, 2.815452894))[0]])), Face(Wire([part_1.edges().sort_by_distance((181.677578431, 81.5, 5.211367765))[0]]))])

    # Croquis39 → Saliente-Extruir37 (add)
    with BuildSketch(Plane(origin=(0, 81.5, 0), x_dir=(1, 0, 0), z_dir=(0, 1, 0))):
        with Locations(Location((-156.4, -2.3, 0), (0, 0, 270))):
            Circle(CROQUIS39_R)
    extrude(amount=SALIENTE_EXTRUIR37_DEPTH)

    # Recubrir3: read off the stored shape, not the designer's step
    # Recubrir3: loft between two sections, ruled curve by curve
    recubrir3_from = [
        Edge.make_bspline([(-157.885934339, 81.5, 0.289527633), (-161.906879074, 81.5, 3.261396311), (-158.935010396, 81.5, 7.282341046), (-154.914065661, 81.5, 4.310472367), (-150.893120926, 81.5, 1.338603689), (-153.864989604, 81.5, -2.682341046), (-157.885934339, 81.5, 0.289527633)], [0, 0, 0, 0, 0.5, 0.5, 0.5, 1, 1, 1, 1], 3, [1, 0.333333333, 0.333333333, 1, 0.333333333, 0.333333333, 1]),
    ]
    recubrir3_to = [
        Edge.make_bspline([(-156.648689887, 85.5, 1.331416839), (-158.585856209, 85.5, 1.828796613), (-158.088476435, 85.5, 3.765962935), (-156.151310113, 85.5, 3.268583161), (-154.214143791, 85.5, 2.771203387), (-154.711523565, 85.5, 0.834037065), (-156.648689887, 85.5, 1.331416839)], [0, 0, 0, 0, 0.5, 0.5, 0.5, 1, 1, 1, 1], 3, [1, 0.333333333, 0.333333333, 1, 0.333333333, 0.333333333, 1]),
    ]
    recubrir3 = Solid(Shell([*[Face.make_surface_from_curves(recubrir3_from[k], recubrir3_to[k]) for k in range(1)], Face(Wire(recubrir3_from)), Face(Wire(recubrir3_to))]))
    add(recubrir3)


solid = part_1.part
